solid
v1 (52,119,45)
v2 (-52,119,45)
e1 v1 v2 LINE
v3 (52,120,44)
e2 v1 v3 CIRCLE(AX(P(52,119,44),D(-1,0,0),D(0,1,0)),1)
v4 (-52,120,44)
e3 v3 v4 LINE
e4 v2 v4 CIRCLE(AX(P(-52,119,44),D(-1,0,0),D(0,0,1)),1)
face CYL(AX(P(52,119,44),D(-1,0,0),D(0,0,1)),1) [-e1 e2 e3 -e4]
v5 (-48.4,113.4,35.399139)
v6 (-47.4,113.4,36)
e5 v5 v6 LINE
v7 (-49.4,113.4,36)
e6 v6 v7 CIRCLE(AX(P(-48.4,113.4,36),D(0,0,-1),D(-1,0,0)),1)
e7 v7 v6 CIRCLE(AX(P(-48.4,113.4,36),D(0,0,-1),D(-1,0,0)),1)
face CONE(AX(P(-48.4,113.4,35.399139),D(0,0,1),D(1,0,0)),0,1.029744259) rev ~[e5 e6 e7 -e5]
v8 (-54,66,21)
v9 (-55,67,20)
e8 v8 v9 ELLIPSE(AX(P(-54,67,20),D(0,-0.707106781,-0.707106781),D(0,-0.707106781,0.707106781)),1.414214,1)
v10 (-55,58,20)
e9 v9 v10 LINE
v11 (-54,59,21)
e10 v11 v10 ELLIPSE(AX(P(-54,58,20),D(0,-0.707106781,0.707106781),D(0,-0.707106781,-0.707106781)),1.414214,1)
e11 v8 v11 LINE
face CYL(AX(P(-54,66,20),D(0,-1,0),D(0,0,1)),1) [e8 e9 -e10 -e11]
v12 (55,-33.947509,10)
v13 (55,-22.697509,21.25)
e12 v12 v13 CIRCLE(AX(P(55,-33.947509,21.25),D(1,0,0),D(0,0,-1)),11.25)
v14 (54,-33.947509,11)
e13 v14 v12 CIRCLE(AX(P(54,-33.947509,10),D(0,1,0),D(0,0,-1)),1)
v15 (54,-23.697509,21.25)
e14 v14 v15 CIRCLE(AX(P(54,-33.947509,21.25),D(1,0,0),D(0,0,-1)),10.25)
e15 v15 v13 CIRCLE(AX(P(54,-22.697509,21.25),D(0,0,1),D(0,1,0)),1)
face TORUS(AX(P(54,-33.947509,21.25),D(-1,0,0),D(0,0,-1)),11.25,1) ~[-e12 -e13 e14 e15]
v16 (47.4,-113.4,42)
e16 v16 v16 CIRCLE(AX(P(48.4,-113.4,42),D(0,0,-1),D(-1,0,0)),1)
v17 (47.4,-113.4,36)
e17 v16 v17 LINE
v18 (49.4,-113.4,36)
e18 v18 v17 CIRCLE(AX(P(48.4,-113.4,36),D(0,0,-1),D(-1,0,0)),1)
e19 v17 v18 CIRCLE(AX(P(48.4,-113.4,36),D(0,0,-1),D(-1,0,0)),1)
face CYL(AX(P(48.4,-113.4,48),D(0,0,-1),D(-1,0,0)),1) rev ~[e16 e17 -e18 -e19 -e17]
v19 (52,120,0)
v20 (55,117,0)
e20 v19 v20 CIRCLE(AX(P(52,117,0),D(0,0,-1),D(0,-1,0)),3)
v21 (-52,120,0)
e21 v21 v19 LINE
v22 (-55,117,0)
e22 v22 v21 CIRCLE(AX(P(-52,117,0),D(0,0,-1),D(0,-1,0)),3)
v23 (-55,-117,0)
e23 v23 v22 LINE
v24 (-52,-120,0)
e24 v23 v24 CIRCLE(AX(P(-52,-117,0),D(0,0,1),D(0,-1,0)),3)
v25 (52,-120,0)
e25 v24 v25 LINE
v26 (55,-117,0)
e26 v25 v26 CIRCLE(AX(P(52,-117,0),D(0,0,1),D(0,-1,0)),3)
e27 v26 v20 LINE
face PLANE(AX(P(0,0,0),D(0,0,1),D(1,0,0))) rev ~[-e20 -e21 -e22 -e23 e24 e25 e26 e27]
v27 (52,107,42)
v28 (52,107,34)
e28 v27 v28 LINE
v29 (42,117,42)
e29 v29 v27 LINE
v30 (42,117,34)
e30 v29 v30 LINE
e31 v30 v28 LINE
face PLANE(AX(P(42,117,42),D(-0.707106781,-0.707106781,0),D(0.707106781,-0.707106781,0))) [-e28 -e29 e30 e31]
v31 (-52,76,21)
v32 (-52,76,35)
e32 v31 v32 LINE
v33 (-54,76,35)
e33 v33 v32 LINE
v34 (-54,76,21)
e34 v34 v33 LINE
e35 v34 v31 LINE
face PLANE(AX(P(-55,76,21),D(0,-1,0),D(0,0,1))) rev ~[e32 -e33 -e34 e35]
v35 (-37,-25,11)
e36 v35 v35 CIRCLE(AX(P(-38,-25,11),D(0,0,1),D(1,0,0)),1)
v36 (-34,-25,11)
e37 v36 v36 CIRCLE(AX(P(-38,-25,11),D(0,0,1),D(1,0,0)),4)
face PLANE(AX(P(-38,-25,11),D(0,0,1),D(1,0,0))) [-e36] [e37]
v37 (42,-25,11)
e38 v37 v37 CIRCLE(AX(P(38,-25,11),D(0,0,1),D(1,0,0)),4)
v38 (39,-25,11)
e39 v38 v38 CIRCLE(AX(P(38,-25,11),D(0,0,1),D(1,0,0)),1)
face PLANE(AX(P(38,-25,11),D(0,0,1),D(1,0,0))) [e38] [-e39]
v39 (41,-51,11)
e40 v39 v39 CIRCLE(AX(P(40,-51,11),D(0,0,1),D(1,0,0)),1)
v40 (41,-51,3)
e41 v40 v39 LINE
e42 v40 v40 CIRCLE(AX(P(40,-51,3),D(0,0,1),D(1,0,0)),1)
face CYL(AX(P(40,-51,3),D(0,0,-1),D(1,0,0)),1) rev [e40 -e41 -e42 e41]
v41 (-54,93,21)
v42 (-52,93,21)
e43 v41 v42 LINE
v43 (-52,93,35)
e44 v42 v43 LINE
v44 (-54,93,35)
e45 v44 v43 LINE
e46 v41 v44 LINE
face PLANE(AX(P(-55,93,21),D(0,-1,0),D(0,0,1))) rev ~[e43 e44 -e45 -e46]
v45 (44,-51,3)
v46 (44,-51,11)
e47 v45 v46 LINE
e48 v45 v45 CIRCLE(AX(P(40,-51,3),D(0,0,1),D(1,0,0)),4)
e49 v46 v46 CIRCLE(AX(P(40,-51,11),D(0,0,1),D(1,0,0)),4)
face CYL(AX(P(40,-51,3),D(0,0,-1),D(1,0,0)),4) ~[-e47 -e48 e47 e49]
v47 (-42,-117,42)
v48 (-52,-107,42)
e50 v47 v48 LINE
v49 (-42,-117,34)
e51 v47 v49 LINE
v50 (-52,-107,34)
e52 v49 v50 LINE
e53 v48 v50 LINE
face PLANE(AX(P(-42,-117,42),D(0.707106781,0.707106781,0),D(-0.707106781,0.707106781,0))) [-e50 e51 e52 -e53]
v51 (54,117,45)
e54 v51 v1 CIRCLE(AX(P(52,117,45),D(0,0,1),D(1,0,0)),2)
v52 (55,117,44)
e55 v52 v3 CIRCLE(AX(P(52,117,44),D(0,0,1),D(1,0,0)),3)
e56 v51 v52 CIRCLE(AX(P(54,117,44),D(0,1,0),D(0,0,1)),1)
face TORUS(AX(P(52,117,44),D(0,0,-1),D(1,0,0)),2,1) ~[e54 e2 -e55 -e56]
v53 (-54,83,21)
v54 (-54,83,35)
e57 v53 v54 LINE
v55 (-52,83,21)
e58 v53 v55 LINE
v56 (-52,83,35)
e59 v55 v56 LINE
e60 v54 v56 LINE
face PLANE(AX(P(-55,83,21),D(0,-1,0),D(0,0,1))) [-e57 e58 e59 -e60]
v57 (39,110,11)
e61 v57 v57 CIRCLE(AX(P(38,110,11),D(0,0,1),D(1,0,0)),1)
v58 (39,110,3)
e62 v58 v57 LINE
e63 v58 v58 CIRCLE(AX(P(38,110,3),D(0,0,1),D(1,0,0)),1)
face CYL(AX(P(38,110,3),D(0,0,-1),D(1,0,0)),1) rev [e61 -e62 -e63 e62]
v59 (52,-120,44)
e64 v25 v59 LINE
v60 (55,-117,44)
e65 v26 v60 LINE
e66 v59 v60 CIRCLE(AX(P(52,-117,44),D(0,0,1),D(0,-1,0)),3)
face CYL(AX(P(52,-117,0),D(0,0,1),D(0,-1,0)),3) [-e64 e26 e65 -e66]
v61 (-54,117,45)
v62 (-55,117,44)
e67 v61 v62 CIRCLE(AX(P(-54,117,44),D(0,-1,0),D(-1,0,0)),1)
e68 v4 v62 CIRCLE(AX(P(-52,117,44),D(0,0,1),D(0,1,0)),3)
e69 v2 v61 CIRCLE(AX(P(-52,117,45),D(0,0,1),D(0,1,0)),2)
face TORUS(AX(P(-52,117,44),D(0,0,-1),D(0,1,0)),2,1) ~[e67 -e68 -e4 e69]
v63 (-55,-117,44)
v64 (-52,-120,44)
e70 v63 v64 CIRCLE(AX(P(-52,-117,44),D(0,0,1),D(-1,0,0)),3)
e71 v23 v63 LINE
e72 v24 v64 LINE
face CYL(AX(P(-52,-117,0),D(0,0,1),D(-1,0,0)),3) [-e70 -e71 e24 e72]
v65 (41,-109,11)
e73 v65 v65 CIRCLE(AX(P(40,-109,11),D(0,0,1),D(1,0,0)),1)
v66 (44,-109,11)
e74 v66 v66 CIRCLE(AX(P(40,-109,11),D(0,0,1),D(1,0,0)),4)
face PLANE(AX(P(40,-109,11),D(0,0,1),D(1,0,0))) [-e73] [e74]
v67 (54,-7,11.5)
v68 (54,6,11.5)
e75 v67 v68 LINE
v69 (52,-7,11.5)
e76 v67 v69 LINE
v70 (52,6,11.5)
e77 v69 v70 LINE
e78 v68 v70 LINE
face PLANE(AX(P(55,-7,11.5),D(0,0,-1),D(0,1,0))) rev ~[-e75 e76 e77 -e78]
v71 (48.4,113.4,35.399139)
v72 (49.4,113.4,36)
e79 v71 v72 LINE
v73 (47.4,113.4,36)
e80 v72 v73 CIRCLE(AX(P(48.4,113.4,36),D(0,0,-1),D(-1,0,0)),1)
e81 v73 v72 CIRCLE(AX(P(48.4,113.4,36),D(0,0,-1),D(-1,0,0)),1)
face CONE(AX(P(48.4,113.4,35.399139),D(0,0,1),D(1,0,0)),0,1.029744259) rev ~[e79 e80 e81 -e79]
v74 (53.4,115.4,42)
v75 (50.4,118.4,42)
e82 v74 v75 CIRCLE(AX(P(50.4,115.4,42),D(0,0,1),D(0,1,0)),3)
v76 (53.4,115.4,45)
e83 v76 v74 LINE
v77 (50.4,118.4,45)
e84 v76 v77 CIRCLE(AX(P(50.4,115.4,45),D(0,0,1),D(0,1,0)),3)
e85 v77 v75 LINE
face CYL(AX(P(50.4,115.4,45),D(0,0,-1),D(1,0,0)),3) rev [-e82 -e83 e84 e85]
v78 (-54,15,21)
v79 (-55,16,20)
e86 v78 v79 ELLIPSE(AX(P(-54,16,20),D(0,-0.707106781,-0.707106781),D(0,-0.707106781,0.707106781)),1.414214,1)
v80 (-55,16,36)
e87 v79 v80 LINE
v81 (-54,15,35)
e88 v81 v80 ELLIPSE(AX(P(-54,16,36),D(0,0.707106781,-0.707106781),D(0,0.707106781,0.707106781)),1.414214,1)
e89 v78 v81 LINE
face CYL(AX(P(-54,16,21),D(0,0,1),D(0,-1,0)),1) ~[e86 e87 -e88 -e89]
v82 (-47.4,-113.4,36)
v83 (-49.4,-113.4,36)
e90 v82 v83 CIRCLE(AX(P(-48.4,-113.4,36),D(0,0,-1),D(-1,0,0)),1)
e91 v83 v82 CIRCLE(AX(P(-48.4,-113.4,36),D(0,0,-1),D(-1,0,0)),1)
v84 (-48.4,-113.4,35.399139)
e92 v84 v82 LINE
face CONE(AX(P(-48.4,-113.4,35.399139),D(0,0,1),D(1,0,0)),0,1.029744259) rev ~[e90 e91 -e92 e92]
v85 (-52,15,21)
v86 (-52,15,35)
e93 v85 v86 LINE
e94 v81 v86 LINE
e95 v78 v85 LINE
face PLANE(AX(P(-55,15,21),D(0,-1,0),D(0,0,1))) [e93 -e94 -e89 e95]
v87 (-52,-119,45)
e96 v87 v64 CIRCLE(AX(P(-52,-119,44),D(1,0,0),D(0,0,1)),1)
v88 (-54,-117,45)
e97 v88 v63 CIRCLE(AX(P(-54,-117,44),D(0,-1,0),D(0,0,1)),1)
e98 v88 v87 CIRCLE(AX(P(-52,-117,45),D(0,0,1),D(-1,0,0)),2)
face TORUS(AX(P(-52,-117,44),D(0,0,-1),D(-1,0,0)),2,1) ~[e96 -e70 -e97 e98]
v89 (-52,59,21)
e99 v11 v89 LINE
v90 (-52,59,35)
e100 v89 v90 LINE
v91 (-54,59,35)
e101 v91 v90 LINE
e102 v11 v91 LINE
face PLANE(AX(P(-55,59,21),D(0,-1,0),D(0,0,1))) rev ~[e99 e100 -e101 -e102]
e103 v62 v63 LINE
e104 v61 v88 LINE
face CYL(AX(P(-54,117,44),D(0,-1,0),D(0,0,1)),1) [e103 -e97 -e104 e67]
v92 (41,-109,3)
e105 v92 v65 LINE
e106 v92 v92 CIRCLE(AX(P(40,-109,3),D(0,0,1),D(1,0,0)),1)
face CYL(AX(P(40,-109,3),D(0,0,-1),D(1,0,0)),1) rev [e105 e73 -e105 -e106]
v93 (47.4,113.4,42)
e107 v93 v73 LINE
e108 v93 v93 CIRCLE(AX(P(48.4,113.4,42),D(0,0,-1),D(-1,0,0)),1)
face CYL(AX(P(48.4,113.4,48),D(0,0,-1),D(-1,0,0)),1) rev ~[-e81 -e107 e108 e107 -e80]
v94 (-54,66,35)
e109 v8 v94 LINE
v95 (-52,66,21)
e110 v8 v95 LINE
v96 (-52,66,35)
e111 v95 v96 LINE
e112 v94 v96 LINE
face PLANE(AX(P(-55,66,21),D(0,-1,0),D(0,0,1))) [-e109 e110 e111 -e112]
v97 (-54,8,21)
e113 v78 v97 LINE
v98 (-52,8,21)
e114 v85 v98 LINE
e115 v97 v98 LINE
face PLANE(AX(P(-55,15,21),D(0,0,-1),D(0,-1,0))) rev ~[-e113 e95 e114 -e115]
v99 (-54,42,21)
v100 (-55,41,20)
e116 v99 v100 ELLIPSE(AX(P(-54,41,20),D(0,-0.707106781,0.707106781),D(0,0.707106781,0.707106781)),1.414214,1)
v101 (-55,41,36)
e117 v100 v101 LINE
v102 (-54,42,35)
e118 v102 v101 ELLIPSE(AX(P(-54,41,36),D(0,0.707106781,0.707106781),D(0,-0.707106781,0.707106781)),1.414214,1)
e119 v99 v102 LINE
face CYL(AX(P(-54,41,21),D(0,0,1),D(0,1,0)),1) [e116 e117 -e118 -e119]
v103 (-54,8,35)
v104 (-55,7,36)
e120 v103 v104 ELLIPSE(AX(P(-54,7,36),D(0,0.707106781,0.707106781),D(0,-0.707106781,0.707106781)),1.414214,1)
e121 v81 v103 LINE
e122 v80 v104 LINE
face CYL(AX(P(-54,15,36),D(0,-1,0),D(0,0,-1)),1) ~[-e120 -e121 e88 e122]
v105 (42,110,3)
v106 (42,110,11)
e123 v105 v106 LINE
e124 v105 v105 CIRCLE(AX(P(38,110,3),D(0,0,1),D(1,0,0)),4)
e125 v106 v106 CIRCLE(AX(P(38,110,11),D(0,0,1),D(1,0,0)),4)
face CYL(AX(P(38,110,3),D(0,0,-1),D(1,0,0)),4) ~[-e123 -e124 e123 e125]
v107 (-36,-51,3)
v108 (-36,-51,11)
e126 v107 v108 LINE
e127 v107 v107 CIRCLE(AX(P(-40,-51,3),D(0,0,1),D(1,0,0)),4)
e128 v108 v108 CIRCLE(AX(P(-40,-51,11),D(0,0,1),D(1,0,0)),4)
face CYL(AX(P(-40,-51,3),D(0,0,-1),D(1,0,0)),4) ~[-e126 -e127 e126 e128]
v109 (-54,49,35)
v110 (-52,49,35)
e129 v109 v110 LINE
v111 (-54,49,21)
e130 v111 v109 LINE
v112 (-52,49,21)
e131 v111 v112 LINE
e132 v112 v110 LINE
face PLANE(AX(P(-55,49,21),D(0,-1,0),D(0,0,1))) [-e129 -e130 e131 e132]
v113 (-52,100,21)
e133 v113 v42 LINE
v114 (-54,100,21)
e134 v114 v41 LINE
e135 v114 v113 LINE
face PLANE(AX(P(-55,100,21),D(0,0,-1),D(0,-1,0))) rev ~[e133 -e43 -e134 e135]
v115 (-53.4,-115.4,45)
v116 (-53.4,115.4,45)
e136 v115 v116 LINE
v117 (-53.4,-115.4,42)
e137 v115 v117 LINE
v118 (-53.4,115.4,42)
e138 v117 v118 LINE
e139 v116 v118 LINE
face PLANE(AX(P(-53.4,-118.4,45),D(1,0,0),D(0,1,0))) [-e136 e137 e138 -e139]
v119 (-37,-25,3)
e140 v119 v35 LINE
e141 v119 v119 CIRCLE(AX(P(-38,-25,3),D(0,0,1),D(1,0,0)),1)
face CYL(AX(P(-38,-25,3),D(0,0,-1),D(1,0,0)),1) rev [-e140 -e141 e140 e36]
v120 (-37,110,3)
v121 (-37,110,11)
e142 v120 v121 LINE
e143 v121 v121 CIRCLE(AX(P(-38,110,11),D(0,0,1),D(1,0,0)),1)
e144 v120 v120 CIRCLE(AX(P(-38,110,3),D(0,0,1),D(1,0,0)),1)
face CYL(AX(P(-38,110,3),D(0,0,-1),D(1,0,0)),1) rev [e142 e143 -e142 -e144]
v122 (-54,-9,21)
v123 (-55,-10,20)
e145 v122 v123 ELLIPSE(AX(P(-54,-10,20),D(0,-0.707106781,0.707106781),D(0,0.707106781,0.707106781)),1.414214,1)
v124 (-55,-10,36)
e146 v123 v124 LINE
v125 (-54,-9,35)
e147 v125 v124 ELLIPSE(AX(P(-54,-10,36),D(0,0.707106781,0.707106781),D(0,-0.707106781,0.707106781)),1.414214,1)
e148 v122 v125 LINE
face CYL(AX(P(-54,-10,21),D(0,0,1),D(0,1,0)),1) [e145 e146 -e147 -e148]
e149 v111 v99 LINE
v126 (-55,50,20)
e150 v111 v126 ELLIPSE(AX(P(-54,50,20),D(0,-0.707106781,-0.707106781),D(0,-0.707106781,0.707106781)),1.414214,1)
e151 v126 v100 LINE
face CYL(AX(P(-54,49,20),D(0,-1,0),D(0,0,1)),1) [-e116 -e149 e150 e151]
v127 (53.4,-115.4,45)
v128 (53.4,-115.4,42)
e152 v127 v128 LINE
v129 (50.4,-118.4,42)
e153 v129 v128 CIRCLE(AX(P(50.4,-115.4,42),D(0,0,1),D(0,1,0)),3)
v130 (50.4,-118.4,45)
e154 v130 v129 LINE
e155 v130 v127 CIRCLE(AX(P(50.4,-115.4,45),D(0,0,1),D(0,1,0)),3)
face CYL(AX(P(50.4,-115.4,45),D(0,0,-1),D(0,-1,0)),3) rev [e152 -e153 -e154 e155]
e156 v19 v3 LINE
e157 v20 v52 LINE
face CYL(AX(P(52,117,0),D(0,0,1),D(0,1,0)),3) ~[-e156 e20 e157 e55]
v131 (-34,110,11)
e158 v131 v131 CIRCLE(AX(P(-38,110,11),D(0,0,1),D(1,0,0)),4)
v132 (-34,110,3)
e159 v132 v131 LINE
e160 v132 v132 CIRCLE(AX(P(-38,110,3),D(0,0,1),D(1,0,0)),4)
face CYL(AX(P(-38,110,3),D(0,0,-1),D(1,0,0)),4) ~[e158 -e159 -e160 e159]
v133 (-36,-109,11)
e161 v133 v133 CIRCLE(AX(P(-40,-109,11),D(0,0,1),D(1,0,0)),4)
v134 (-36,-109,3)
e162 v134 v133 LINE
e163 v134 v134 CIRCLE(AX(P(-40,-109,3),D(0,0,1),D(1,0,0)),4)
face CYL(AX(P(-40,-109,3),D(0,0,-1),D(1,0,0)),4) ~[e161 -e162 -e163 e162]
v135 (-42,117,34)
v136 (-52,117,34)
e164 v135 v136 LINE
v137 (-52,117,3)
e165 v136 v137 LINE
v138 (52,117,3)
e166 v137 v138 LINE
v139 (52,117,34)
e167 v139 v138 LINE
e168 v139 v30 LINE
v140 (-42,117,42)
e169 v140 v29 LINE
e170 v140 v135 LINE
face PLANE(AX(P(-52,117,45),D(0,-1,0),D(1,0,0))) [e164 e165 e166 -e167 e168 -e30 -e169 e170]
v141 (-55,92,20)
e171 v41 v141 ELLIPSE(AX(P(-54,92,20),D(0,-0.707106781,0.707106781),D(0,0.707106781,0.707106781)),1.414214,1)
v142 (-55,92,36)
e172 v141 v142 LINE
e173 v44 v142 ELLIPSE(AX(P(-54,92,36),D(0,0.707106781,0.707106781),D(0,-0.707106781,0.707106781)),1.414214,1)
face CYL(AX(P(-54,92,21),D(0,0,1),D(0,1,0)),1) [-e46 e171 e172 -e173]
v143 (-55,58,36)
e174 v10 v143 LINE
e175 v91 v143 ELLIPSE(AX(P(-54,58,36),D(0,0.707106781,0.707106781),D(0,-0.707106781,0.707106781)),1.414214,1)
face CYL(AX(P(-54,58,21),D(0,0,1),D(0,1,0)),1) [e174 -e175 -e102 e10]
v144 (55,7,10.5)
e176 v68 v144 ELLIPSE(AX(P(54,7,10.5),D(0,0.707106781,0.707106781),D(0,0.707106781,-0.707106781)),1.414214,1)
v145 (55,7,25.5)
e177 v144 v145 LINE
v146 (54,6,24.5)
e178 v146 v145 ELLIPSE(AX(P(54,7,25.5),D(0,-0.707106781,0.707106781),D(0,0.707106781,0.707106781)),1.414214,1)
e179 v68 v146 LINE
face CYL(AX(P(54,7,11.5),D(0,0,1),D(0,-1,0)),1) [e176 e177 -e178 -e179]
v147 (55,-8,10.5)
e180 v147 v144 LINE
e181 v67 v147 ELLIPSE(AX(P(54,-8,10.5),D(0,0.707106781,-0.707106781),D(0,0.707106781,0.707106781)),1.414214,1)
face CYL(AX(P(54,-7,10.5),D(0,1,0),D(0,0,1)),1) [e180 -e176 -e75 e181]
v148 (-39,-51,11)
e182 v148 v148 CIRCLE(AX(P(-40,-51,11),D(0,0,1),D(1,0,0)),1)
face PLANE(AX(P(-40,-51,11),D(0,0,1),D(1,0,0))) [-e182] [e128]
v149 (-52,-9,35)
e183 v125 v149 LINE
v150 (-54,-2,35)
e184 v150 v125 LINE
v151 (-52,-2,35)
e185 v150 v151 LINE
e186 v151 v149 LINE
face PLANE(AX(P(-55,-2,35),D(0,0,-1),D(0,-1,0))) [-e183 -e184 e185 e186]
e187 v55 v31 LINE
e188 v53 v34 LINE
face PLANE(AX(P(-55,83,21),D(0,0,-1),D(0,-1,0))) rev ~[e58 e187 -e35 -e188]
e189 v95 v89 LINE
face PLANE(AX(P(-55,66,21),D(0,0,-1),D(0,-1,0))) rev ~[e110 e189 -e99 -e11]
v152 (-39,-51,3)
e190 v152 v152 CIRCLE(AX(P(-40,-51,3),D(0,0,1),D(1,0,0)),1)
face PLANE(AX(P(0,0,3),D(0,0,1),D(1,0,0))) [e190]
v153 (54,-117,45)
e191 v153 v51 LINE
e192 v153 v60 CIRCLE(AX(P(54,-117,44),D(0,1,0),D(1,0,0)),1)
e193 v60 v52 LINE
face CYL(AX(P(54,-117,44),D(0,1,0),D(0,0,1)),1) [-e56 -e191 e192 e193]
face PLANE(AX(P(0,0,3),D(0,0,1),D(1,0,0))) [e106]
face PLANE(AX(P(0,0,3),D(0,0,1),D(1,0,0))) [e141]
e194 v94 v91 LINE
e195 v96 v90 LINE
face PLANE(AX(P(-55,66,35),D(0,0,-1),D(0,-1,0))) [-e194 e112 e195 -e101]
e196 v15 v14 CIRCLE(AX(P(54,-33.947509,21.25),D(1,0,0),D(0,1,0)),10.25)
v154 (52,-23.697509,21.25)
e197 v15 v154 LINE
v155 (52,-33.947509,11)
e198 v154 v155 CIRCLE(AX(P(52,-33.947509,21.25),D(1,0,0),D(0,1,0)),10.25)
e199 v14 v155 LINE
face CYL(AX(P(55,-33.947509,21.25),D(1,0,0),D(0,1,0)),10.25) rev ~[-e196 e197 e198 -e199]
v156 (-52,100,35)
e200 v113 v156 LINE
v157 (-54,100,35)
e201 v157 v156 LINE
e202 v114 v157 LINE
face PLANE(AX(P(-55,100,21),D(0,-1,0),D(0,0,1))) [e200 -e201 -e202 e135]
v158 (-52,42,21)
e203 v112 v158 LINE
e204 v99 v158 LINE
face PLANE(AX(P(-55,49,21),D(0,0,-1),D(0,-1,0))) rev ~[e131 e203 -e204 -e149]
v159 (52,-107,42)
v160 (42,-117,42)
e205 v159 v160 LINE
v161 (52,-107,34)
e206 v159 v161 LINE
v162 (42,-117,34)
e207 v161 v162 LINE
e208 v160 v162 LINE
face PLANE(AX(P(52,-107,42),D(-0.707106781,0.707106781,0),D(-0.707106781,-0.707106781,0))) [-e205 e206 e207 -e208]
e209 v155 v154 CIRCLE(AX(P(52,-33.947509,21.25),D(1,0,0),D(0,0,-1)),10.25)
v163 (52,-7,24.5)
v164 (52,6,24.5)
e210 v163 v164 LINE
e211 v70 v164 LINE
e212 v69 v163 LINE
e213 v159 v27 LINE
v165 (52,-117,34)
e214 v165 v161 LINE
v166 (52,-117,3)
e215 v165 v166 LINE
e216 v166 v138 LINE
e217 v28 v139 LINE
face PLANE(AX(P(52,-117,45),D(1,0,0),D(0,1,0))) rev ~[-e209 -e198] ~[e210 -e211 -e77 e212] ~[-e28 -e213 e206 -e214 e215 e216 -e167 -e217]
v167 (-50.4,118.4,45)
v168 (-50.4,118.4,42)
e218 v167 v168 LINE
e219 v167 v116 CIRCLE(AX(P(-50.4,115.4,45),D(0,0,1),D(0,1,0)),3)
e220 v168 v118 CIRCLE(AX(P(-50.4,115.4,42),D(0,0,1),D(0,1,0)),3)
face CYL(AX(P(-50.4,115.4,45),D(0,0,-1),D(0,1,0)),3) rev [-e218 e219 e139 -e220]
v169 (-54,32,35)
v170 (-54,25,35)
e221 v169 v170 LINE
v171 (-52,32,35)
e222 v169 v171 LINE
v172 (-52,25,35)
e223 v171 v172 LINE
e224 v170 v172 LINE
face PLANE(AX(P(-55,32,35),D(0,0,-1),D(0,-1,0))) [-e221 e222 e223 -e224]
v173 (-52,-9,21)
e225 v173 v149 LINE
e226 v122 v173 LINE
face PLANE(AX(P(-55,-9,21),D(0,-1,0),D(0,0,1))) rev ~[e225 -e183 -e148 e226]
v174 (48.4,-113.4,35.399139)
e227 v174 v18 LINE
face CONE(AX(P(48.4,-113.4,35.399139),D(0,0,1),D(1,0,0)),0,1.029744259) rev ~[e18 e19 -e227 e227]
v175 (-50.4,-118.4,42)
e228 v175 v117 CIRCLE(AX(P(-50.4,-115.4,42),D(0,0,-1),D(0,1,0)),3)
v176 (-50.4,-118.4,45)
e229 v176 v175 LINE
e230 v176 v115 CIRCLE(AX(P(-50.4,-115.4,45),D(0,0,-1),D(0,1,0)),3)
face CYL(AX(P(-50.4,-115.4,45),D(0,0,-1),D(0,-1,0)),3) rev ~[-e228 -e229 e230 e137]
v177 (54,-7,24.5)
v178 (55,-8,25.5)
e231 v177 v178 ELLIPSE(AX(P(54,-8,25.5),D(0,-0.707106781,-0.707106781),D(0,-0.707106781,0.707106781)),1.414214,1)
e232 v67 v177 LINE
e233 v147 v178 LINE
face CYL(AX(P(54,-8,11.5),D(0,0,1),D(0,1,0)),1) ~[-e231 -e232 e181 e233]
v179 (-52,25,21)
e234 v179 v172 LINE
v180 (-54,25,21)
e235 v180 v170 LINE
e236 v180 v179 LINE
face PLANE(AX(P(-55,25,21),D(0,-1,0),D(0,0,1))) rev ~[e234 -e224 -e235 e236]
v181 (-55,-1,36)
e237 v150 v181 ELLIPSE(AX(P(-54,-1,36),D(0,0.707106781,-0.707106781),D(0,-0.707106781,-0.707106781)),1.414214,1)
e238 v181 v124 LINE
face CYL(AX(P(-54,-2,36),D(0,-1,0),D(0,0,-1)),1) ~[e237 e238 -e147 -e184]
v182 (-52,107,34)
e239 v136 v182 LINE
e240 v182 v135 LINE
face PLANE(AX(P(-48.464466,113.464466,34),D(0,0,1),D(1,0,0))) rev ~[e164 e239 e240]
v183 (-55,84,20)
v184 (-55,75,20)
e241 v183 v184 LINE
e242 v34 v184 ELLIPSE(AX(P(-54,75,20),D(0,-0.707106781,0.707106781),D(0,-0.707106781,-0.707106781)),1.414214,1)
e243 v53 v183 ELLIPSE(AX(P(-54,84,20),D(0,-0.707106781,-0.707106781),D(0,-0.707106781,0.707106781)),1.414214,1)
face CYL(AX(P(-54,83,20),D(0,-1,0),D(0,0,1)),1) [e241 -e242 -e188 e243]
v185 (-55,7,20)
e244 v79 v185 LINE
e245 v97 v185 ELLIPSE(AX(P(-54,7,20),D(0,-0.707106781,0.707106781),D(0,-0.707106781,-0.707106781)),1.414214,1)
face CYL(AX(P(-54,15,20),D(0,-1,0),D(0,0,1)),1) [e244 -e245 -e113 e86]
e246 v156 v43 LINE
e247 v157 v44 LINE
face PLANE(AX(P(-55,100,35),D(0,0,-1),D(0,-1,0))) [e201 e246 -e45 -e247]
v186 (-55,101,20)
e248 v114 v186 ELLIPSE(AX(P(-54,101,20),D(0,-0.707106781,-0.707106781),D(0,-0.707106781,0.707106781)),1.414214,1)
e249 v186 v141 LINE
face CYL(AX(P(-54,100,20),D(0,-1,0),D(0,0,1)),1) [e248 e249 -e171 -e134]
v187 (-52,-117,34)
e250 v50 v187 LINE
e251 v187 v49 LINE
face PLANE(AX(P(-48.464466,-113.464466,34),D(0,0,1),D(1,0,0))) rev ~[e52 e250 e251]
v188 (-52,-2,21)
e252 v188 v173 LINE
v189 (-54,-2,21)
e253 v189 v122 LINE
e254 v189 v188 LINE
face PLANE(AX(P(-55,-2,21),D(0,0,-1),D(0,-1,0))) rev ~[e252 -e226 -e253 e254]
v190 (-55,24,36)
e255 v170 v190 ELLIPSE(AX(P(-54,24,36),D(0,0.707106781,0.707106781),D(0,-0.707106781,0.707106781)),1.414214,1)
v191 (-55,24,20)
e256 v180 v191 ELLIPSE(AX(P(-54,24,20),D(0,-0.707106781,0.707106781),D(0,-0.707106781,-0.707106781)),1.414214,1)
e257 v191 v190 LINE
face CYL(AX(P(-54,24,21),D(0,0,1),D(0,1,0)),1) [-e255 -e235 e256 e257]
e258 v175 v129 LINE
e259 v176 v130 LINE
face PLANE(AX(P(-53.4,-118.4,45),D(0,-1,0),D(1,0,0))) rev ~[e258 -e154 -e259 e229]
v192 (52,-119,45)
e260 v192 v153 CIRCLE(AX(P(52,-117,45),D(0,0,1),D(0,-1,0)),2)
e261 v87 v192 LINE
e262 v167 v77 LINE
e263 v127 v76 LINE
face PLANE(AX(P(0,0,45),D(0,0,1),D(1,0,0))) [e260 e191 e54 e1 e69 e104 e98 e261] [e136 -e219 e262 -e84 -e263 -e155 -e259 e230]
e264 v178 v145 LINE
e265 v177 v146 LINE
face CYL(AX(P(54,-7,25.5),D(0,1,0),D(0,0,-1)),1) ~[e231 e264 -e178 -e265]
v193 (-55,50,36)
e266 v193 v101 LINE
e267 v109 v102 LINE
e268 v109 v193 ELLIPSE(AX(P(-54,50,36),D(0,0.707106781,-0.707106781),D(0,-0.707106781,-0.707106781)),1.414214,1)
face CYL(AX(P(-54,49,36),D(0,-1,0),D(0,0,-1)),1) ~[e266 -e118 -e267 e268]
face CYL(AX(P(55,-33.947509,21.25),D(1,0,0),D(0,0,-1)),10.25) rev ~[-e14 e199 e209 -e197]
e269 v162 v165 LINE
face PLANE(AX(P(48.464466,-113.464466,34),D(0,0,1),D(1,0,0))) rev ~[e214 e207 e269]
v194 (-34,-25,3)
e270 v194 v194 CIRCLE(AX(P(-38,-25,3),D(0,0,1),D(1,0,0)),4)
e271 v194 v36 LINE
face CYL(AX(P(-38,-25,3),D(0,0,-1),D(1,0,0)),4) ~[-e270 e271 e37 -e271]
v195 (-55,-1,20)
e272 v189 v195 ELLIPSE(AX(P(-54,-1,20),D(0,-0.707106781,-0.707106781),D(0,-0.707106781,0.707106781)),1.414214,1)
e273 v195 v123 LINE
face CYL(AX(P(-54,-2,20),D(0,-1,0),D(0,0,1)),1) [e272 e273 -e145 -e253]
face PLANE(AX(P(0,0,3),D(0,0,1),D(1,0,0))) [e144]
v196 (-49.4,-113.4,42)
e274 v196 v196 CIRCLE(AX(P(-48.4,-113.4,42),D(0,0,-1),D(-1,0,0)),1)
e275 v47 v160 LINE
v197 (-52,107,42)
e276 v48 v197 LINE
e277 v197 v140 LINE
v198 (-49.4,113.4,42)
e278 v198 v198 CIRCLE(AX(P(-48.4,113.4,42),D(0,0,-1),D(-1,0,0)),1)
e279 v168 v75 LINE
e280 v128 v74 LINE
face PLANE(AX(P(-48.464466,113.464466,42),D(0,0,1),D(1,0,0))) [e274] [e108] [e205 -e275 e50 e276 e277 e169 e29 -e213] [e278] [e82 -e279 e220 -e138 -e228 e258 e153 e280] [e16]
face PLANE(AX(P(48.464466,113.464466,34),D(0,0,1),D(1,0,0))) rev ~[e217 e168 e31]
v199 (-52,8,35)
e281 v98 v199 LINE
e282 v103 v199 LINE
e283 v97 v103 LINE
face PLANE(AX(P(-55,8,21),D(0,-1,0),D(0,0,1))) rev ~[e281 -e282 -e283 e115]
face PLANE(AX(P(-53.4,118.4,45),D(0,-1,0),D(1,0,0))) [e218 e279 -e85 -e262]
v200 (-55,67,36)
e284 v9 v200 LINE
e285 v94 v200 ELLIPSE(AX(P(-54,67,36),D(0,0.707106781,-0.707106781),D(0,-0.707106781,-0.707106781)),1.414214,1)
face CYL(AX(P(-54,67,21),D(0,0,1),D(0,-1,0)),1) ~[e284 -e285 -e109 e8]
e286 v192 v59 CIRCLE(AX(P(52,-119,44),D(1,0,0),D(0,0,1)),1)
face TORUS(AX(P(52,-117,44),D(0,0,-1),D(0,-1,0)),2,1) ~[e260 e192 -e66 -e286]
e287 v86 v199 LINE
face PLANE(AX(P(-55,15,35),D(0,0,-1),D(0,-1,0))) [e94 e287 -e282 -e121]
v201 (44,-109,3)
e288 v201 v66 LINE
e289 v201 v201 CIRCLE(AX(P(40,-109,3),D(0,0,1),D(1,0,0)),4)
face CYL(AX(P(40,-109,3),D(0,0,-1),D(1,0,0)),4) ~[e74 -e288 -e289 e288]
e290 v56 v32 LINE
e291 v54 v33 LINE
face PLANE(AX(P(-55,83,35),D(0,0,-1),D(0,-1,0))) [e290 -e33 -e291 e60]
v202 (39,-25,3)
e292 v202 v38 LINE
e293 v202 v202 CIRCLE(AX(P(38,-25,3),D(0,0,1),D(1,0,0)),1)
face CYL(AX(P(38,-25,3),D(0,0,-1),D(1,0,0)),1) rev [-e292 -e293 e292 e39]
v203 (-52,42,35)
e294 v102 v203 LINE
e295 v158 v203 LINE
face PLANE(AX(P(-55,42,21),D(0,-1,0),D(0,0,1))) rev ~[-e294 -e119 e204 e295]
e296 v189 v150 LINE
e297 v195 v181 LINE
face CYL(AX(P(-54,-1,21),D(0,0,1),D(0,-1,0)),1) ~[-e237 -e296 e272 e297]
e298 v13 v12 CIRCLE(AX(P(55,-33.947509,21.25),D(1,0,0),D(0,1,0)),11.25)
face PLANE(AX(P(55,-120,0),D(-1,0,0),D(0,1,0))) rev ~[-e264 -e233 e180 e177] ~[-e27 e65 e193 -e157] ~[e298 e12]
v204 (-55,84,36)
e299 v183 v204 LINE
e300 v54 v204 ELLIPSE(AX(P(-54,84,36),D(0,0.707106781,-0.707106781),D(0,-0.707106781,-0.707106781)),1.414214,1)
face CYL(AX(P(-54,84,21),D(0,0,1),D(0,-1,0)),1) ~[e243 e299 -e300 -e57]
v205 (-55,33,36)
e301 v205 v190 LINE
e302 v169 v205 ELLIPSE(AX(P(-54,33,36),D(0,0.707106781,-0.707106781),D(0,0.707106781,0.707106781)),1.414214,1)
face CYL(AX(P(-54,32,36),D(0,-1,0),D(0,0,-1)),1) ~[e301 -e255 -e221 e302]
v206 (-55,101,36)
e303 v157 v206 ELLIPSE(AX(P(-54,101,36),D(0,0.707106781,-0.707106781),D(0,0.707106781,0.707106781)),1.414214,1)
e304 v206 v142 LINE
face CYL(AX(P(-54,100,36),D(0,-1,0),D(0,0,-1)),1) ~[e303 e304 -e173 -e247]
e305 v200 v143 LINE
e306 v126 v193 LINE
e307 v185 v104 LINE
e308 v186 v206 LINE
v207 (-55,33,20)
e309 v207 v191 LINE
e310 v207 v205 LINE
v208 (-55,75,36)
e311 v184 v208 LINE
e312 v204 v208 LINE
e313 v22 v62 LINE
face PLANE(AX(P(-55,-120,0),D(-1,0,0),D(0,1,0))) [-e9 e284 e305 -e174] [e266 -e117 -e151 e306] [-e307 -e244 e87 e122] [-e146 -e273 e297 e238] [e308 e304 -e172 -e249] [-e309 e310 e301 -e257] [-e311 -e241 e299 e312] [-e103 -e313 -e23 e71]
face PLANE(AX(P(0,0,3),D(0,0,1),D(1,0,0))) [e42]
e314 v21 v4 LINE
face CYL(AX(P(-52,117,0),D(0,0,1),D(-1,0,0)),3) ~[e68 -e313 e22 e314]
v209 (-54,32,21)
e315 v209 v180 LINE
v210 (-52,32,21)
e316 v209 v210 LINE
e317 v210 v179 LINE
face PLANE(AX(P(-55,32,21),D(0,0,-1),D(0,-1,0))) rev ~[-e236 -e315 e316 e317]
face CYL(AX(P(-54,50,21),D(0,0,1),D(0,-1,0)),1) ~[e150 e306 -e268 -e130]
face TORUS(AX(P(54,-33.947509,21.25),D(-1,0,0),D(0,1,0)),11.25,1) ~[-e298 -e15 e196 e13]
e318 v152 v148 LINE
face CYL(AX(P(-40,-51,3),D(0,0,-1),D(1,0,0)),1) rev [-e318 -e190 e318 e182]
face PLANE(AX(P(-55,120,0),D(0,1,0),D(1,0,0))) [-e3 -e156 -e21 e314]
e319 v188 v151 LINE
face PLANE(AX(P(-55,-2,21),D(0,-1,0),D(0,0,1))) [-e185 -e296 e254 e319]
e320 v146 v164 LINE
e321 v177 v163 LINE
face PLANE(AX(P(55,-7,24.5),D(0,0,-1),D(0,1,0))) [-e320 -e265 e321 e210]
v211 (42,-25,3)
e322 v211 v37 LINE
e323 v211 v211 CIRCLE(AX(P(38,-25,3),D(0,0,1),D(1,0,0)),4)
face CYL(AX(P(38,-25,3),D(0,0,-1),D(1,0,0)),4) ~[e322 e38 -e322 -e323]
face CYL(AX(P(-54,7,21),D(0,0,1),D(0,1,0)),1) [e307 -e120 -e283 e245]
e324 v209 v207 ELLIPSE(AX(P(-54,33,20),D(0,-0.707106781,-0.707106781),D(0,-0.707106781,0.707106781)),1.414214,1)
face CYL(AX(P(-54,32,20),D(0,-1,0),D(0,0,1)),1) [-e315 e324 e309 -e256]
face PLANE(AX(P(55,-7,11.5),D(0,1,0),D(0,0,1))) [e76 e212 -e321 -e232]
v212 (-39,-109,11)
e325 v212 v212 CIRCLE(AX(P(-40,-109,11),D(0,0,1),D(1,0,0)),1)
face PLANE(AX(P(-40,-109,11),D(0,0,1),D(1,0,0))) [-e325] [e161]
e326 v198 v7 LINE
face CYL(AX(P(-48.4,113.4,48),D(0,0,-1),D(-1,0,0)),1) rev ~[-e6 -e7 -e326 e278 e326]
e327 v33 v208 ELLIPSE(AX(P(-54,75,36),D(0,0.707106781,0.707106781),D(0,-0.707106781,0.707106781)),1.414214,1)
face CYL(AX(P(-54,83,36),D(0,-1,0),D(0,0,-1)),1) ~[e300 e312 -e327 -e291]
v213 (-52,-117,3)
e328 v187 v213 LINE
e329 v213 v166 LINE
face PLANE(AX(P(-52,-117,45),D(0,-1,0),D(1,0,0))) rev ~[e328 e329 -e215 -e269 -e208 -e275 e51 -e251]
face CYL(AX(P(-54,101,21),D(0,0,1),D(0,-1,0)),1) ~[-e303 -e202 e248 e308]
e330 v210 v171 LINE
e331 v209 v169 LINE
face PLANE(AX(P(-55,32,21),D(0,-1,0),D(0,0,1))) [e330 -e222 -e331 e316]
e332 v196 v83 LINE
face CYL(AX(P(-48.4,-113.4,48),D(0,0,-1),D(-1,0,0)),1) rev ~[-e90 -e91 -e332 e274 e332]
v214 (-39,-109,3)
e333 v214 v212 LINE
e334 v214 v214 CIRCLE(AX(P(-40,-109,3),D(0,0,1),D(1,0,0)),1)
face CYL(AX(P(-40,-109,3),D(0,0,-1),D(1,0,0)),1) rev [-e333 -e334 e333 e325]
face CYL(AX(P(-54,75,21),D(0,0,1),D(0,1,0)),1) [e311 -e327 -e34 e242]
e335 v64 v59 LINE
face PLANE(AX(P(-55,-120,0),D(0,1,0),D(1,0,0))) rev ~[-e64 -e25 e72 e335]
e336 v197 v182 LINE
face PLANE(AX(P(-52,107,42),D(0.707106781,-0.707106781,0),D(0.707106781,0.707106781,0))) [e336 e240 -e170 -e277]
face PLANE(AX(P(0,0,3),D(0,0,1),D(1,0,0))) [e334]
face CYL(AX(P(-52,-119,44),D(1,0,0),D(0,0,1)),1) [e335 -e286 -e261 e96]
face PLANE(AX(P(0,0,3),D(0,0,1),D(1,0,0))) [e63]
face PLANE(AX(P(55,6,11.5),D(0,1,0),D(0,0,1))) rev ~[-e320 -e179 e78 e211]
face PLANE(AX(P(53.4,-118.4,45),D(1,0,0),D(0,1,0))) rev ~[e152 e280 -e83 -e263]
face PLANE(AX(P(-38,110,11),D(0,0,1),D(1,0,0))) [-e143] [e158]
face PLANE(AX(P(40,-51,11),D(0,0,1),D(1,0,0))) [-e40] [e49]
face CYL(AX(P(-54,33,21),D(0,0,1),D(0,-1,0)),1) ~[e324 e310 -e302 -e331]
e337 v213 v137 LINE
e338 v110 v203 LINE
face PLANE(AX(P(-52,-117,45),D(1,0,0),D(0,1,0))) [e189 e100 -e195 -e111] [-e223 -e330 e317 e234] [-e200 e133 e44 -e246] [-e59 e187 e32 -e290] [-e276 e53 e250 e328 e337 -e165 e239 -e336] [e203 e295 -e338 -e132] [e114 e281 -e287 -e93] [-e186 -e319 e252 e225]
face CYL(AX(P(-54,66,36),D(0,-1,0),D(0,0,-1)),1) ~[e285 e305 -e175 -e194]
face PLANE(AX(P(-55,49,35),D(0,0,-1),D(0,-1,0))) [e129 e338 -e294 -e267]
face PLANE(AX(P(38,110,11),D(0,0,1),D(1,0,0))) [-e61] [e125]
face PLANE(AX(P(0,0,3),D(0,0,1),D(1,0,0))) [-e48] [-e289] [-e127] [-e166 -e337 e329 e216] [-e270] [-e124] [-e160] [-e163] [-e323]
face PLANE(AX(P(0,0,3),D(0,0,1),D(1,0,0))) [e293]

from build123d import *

# Parameters (mm, degrees)
F0_W      = 110
F0_H      = 240
F1_DEPTH  = 45
F2_W      = 104
F2_H      = 234
F3_DEPTH  = 42
F4_W      = 106.8
F4_H      = 236.8
F4_W_2    = 104
F4_H_2    = 234
F5_DEPTH  = 3
F6_R      = 4
F6_R_2    = 1
F7_DEPTH  = 8
F8_W      = 13
F8_H      = 13
F9_DEPTH  = 3
F10_W     = 7
F10_H     = 14
F11_DEPTH = 3
F12_R     = 3
F13_R     = 3
F15_DEPTH = 8
F17_DEPTH = 3
F18_D     = 2
F18_DEPTH = 6
F18_TIP   = 0.600860619
F19_R     = 1


# Not quite as in the source:
# - a feature names something its author has since deleted; it is built from what else it names


with BuildPart() as f1:
    # F0 (on Top) → F1 (new body)
    with BuildSketch(Plane.XY):
        Rectangle(F0_W, F0_H)
    extrude(amount=F1_DEPTH)

    # F2 (on face) → F3 (cut, through all)
    with BuildSketch(Plane.XY.offset(45)):
        Rectangle(F2_W, F2_H)
    extrude(amount=-F3_DEPTH, mode=Mode.SUBTRACT)

    # F4 (on face) → F5 (cut)
    with BuildSketch(Plane.XY.offset(45)):
        Rectangle(F4_W, F4_H)
        Rectangle(F4_W_2, F4_H_2, mode=Mode.SUBTRACT)
    extrude(amount=-F5_DEPTH, mode=Mode.SUBTRACT)

    # F6 (on face) → F7 (join)
    with BuildSketch(Plane.XY.offset(3)):
        with Locations((-38, 110)):
            Circle(F6_R)
        with Locations((-38, 110)):
            Circle(F6_R_2, mode=Mode.SUBTRACT)
        with Locations((38, 110)):
            Circle(F6_R)
        with Locations((38, 110)):
            Circle(F6_R_2, mode=Mode.SUBTRACT)
        with Locations((-38, -25)):
            Circle(F6_R)
        with Locations((-38, -25)):
            Circle(F6_R_2, mode=Mode.SUBTRACT)
        with Locations((38, -25)):
            Circle(F6_R)
        with Locations((38, -25)):
            Circle(F6_R_2, mode=Mode.SUBTRACT)
        with Locations((-40, -51)):
            Circle(F6_R)
        with Locations((-40, -51)):
            Circle(F6_R_2, mode=Mode.SUBTRACT)
        with Locations((40, -51)):
            Circle(F6_R)
        with Locations((40, -51)):
            Circle(F6_R_2, mode=Mode.SUBTRACT)
        with Locations((-40, -109)):
            Circle(F6_R)
        with Locations((-40, -109)):
            Circle(F6_R_2, mode=Mode.SUBTRACT)
        with Locations((40, -109)):
            Circle(F6_R)
        with Locations((40, -109)):
            Circle(F6_R_2, mode=Mode.SUBTRACT)
    extrude(amount=F7_DEPTH)

    # F8 (on face) → F9 (cut, through all)
    with BuildSketch(Plane.YZ.offset(55)):
        with Locations((-0.5, 18)):
            Rectangle(F8_W, F8_H)
    extrude(amount=-F9_DEPTH, mode=Mode.SUBTRACT)

    # F10 (on face) → F11 (cut, through all)
    with BuildSketch(Plane(origin=(-55, 0, 0), x_dir=(0, -1, 0), z_dir=(-1, 0, 0))):
        with Locations((-62.5, 28)):
            Rectangle(F10_W, F10_H)
        with Locations((-45.5, 28)):
            Rectangle(F10_W, F10_H)
        with Locations((-28.5, 28)):
            Rectangle(F10_W, F10_H)
        with Locations((-11.5, 28)):
            Rectangle(F10_W, F10_H)
        with Locations((5.5, 28)):
            Rectangle(F10_W, F10_H)
        with Locations((-79.5, 28)):
            Rectangle(F10_W, F10_H)
        with Locations((-96.5, 28)):
            Rectangle(F10_W, F10_H)
    extrude(amount=-F11_DEPTH, mode=Mode.SUBTRACT)

    # F12
    f12_edges = [f1.edges().sort_by_distance(p)[0] for p in [
        (-55, -120, 22.5),
        (55, -120, 22.5),
        (-55, 120, 22.5),
        (55, 120, 22.5),
    ]]
    fillet(f12_edges, radius=F12_R)

    # F13
    f13_edges = [f1.edges().sort_by_distance(p)[0] for p in [
        (-53.4, 118.4, 43.5),
        (53.4, 118.4, 43.5),
        (53.4, -118.4, 43.5),
        (-53.4, -118.4, 43.5),
    ]]
    fillet(f13_edges, radius=F13_R)

    # F14 (on face) → F15 (join)
    with BuildSketch(Plane.XY.offset(42)):
        Polygon((-42, 117), (-52, 117), (-52, 107), align=None)
        Polygon((52, 107), (52, 117), (42, 117), align=None)
        Polygon((42, -117), (52, -117), (52, -107), align=None)
        Polygon((-52, -107), (-52, -117), (-42, -117), align=None)
    extrude(amount=-F15_DEPTH)

    # F16 (on face) → F17 (cut, through all)
    with BuildSketch(Plane.YZ.offset(55)):
        with BuildLine():
            ThreePointArc((-33.9475087821, 11), (-26.699664275, 14.0021554928), (-23.6975087821, 21.25))
            ThreePointArc((-23.6975087821, 21.25), (-41.1953532893, 28.4978445072), (-33.9475087821, 11))
        make_face()
    extrude(amount=-F17_DEPTH, mode=Mode.SUBTRACT)

    # F18
    with Locations(Plane.XY.offset(42)):
        with Locations((48.4, 113.4), (-48.4, 113.4), (-48.4, -113.4), (48.4, -113.4)):
            Hole(F18_D / 2, depth=F18_DEPTH)
            with Locations((0, 0, -(F18_DEPTH + F18_TIP / 2))):  # 118° drill point
                Cone(0, F18_D / 2, F18_TIP, mode=Mode.SUBTRACT)

    # F19
    f19_edges = [f1.edges().sort_by_distance(p)[0] for p in [
        (0, -120, 45),
        (55, -33.947509, 31.5),
        (55, -7, 18),
        (55, -0.5, 11.5),
        (55, 6, 18),
        (55, -0.5, 24.5),
        (-55, 100, 28),
        (-55, 93, 28),
        (-55, 96.5, 21),
        (-55, 96.5, 35),
        (-55, 79.5, 35),
        (-55, 83, 28),
        (-55, 79.5, 21),
        (-55, 76, 28),
        (-55, 62.5, 35),
        (-55, 66, 28),
        (-55, 62.5, 21),
        (-55, 59, 28),
        (-55, 45.5, 35),
        (-55, 42, 28),
        (-55, 49, 28),
        (-55, 45.5, 21),
        (-55, 32, 28),
        (-55, 28.5, 21),
        (-55, 28.5, 35),
        (-55, 25, 28),
        (-55, 15, 28),
        (-55, 11.5, 21),
        (-55, 11.5, 35),
        (-55, 8, 28),
        (-55, -5.5, 35),
        (-55, -2, 28),
        (-55, -9, 28),
        (-55, -5.5, 21),
    ]]
    fillet(f19_edges, radius=F19_R)


solid = f1.part
